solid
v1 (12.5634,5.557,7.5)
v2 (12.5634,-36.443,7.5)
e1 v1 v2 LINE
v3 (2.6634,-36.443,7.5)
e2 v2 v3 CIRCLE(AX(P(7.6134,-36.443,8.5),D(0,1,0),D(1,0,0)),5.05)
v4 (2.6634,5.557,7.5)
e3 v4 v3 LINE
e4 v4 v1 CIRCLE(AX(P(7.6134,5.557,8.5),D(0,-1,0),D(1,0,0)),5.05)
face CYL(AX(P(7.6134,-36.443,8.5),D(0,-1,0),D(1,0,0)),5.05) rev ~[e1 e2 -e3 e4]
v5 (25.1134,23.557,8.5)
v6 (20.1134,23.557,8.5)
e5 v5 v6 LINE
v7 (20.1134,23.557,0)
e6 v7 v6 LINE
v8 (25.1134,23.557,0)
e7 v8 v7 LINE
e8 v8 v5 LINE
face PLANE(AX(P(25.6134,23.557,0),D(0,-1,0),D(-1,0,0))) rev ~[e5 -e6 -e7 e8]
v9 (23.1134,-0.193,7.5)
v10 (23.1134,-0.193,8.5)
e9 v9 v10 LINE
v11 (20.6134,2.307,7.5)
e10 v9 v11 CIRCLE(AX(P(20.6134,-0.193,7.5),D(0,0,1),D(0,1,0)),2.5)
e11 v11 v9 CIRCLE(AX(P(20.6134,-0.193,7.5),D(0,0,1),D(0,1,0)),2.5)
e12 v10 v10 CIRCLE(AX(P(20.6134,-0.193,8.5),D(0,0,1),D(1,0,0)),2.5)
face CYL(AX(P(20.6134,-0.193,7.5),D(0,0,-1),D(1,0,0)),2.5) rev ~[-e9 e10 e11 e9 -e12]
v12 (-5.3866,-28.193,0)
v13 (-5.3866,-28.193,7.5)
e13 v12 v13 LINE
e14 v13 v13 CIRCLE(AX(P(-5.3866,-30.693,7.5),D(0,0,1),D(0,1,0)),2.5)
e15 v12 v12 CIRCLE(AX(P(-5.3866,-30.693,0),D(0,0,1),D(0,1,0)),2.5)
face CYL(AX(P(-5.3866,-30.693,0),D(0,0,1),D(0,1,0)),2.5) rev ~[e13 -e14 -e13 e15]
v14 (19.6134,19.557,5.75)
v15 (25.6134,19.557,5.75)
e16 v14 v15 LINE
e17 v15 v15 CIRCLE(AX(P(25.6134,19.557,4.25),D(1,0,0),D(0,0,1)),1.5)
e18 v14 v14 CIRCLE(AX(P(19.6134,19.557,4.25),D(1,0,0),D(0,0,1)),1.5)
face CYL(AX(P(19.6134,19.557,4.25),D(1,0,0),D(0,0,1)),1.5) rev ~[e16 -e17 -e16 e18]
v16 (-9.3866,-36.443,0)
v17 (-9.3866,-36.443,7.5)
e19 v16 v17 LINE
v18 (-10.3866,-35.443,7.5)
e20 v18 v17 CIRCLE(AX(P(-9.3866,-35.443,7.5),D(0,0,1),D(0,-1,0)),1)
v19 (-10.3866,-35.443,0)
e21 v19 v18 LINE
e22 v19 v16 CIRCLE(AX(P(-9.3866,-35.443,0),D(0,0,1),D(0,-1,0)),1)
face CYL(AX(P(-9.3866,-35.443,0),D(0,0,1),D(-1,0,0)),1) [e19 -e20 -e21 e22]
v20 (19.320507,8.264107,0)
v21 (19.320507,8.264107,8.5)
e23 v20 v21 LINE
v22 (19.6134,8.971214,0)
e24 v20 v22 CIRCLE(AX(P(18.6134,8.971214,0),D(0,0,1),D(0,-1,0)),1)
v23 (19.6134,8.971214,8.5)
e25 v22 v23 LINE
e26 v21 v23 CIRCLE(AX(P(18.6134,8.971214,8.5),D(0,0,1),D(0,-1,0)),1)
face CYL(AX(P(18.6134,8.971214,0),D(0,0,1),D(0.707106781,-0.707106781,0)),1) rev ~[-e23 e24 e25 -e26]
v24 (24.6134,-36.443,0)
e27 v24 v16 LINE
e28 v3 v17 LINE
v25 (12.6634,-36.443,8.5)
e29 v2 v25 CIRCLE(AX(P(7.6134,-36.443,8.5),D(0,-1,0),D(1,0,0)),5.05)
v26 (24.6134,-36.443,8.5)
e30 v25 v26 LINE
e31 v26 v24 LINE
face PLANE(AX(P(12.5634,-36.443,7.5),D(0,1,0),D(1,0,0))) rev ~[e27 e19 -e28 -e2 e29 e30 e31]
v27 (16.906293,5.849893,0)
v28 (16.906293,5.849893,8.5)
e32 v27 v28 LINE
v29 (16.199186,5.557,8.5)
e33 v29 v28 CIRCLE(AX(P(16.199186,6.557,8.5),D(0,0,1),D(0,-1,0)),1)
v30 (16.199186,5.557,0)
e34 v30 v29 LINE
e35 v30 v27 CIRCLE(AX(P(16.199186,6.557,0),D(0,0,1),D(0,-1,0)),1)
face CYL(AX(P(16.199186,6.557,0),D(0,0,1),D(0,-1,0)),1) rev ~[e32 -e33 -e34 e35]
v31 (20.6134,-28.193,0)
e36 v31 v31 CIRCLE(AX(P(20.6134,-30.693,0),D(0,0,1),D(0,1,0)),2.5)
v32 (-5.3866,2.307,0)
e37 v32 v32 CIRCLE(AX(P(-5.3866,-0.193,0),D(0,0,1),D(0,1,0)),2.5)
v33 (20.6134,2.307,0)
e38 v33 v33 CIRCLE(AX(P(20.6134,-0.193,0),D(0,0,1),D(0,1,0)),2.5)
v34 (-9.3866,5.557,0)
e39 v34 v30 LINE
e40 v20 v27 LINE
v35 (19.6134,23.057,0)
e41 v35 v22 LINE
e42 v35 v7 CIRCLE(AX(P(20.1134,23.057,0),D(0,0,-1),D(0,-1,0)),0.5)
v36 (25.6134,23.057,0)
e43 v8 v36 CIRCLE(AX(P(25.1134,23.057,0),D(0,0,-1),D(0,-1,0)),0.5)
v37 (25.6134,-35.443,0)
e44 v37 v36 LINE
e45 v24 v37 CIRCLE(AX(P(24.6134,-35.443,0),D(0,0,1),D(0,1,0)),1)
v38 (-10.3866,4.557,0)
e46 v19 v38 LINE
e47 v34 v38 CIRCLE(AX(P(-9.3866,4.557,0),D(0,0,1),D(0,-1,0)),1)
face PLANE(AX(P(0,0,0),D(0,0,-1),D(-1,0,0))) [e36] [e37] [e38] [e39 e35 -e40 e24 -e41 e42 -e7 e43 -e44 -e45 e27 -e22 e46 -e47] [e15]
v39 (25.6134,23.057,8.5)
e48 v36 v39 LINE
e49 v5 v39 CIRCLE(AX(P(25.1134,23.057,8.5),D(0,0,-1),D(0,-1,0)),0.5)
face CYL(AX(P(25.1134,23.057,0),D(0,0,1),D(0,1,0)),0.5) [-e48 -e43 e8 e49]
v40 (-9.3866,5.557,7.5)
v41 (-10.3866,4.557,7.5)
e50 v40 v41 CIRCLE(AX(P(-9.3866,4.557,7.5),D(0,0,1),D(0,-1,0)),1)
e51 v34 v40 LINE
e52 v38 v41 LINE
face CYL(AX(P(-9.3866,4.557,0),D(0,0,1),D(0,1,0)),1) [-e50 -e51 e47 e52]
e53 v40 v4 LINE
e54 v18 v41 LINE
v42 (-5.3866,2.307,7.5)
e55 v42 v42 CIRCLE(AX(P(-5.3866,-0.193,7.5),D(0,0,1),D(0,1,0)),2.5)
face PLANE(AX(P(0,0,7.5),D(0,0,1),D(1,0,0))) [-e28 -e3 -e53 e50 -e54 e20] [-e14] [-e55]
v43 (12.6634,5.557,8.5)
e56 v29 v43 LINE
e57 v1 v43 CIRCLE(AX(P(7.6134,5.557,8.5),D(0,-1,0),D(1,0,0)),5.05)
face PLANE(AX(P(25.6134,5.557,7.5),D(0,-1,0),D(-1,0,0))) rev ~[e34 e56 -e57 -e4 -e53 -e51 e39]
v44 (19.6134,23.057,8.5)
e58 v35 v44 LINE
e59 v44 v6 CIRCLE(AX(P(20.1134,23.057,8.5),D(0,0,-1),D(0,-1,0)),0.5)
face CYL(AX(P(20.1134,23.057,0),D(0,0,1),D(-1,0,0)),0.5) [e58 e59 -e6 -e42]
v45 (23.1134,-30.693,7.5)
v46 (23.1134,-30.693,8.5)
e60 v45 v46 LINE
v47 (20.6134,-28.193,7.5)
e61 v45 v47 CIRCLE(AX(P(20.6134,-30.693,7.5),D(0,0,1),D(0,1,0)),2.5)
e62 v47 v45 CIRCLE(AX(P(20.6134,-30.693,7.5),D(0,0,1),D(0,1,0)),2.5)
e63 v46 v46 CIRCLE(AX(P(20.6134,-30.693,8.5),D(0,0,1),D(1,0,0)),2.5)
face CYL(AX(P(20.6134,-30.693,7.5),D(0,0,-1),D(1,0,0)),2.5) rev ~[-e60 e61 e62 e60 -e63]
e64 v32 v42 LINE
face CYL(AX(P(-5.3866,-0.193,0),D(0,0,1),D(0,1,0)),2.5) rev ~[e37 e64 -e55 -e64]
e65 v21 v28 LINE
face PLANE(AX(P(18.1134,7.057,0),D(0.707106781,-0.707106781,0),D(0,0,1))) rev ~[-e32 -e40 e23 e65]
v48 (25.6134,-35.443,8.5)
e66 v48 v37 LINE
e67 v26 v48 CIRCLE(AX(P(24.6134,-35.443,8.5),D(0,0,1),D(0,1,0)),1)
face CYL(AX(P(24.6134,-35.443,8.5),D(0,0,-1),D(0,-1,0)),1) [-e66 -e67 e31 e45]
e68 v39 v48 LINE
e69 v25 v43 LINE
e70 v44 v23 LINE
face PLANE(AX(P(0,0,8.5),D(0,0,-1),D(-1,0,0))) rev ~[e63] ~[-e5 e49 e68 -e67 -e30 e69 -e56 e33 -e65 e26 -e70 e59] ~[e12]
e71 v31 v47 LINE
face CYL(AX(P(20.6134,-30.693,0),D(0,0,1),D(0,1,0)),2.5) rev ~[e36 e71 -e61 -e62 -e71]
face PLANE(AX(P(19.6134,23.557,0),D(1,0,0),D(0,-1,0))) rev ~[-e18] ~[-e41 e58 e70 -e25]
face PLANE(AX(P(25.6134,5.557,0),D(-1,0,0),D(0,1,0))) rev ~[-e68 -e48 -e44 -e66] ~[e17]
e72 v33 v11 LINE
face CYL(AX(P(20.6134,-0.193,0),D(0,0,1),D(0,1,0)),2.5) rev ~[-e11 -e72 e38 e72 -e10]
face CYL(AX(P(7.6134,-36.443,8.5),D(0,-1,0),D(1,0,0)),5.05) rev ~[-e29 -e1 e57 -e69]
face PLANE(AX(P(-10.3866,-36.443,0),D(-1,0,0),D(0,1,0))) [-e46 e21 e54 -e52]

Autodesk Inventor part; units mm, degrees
ref_plane "YZ Plane" through (0, 0, 0) normal (1, 0, 0) x (0, 1, 0)
ref_plane "XZ Plane" through (0, 0, 0) normal (0, 1, 0) x (-1, 0, 0)
ref_plane "XY Plane" through (0, 0, 0) normal (0, 0, 1) x (1, 0, 0)
sketch "Szkic1" plane through (0, 0, 0) normal (0, 0, 1) x (1, 0, 0)
  line L0 (-10.3866, 5.557) -> (25.6134, 5.557)
  line L1 (25.6134, 5.557) -> (25.6134, -36.443)
  line L2 (25.6134, -36.443) -> (-10.3866, -36.443)
  line L3 (-10.3866, -36.443) -> (-10.3866, 5.557)
  point P0 (0, 0)
  point P1 (20.6134, -0.193)
  point P2 (20.6134, -30.693)
  point P3 (-5.3866, -0.193)
  point P4 (-5.3866, -30.693)
  dimension "d0" = 36
  dimension "d1" = 42
  dimension "d2" = 5
  dimension "d3" = 5
  dimension "d4" = 5
  dimension "d5" = 5
  dimension "d6" = 5.75
  dimension "d7" = 5.75
  dimension "d8" = 5.75
  dimension "d9" = 5.75
extrude "Wyciągnięcie proste1" add sketch "Szkic1" along normal blind 7.5
hole "Otwór1" at (20.6134, -0.193, 0) at (20.6134, -30.693, 0) at (-5.3866, -0.193, 0) at (-5.3866, -30.693, 0) direction (0, 0, 1) diameter 5 end through all
sketch "Szkic2" plane through (-10.3866, -36.443, 0) normal (0, -1, 0) x (1, 0, 0)
  line L0 (36, 0) -> (0, 0) projected
  line L1 (36, 0) -> (36, 7.5) projected
  line L2 (0, 7.5) -> (36, 7.5) projected
  line L3 (0, 0) -> (0, 7.5) projected
  line L4 (36, 7.5) -> (0, 7.5) projected
  circle A0 centre (18, 8.5) radius 5.05
  point P0 (10.3866, 0)
  dimension "d19" = 36
  dimension "d25" = 8.5
  dimension "d26" = 18
  dimension "d27" = 10.1
extrude "Wyciągnięcie proste2" cut sketch "Szkic2" against normal through all contours A0 L2 | L2 A0
sketch "Szkic3" plane through (0, 0, 7.5) normal (0, 0, 1) x (1, 0, 0)
  line L0 (25.6134, 5.557) -> (12.5634, 5.557) projected
  line L1 (12.5634, 5.557) -> (12.5634, -36.443) projected
  line L2 (-10.3866, -36.443) -> (2.6634, -36.443) projected
  line L3 (25.6134, -36.443) -> (25.6134, 5.557) projected
  circle A0 centre (20.6134, -0.193) radius 2.5 projected
  circle A1 centre (20.6134, -30.693) radius 2.5 projected
  line L4 (12.5634, -36.443) -> (25.6134, -36.443) projected
  line L5 (2.6634, -36.443) -> (2.6634, 5.557) projected
  line L6 (2.6634, 5.557) -> (-10.3866, 5.557) projected
  line L7 (-10.3866, 5.557) -> (-10.3866, -36.443) projected
  point P0 (0, 0)
extrude "Wyciągnięcie proste3" add sketch "Szkic3" along normal blind 1 contours L3 L4 L1 L0
sketch "Szkic4" plane through (0, 0, 0) normal (0, 0, -1) x (-1, 0, 0)
  circle A0 centre (5.3866, -0.193) radius 2.5 projected
  circle A1 centre (-20.6134, -0.193) radius 2.5 projected
  circle A2 centre (-20.6134, -30.693) radius 2.5 projected
  circle A3 centre (5.3866, -30.693) radius 2.5 projected
  line L0 (10.3866, 5.557) -> (-25.6134, 5.557) projected
  line L1 (-25.6134, 5.557) -> (-25.6134, -36.443) projected
  line L2 (-25.6134, -36.443) -> (10.3866, -36.443) projected
  line L3 (10.3866, -36.443) -> (10.3866, 5.557) projected
  line L4 (-25.6134, 5.557) -> (-25.6134, 23.557)
  line L5 (-25.6134, 23.557) -> (-19.6134, 23.557)
  line L6 (-19.6134, 23.557) -> (-19.6134, 5.557)
  point P0 (0, 0)
  dimension "d30" = 18
  dimension "d31" = 6
extrude "Wyciągnięcie proste4" add sketch "Szkic4" against normal blind 8.5 contours L0 L4 L5 L6
sketch "Szkic5" plane through (19.6134, 5.557, 0) normal (-1, 0, 0) x (0, 0, 1)
  line L0 (0, 0) -> (0, 18) projected
  line L1 (8.5, 0) -> (0, 0) projected
  line L2 (8.5, 18) -> (8.5, 0) projected
  line L3 (0, 18) -> (8.5, 18) projected
  point P0 (0, -5.557)
  point P1 (4.25, 14)
  dimension "d34" = 4.25
  dimension "d35" = 4
  dimension "d47" = 8.5
hole "Otwór2" at (19.6134, 19.557, 4.25) direction (1, 0, 0) diameter 3 end through all
chamfer "Faza1" distance 3 angle 45 1 edges at (19.6134, 5.557, 4.25)
fillet "Zaokrąglenie2" radius 1 5 edges at (-10.3866, 5.557, 3.75) (-10.3866, -36.443, 3.75) (25.6134, -36.443, 4.25) (19.6134, 8.557, 4.25) (16.6134, 5.557, 4.25)
sketch "Szkic6" plane through (7.6134, -36.443, 8.5) normal (0, -1, 0) x (1, 0, 0)
  line L0 (17, 0) -> (17, -8.5) projected
  line L1 (4.95, 0) -> (17, 0) projected
  line L2 (4.95, -1) -> (4.95, 0) projected
  arc A0 (-4.95, -1) -> (4.95, -1) centre (0, 0) ccw projected
  line L3 (-17, -1) -> (-4.95, -1) projected
  line L4 (-17, -8.5) -> (-17, -1) projected
  line L5 (17, -8.5) -> (-17, -8.5) projected
  circle A1 centre (0, 0) radius 5.05
  point P0 (-7.6134, -8.5)
  dimension "d49" = 10.1
extrude "Wyciągnięcie proste5" cut sketch "Szkic6" against normal through all contours A1 L2 L1 | L1 L2 A0 A1
fillet "Zaokrąglenie3" radius 0.5 2 edges at (19.6134, 23.557, 4.25) (25.6134, 23.557, 4.25)
equation "\"d7\" = d6"
equation "\"d8\" = d7"
equation "\"d9\" = d6"
equation "\"d26\" = 0.5 * d19"
equation "\"d34\" = 0.5 * d47"
properties part number "3DP_ABS_X_Axis_Linear_Shaft_Clamp_Bottom_With_Endstop_Screw"
